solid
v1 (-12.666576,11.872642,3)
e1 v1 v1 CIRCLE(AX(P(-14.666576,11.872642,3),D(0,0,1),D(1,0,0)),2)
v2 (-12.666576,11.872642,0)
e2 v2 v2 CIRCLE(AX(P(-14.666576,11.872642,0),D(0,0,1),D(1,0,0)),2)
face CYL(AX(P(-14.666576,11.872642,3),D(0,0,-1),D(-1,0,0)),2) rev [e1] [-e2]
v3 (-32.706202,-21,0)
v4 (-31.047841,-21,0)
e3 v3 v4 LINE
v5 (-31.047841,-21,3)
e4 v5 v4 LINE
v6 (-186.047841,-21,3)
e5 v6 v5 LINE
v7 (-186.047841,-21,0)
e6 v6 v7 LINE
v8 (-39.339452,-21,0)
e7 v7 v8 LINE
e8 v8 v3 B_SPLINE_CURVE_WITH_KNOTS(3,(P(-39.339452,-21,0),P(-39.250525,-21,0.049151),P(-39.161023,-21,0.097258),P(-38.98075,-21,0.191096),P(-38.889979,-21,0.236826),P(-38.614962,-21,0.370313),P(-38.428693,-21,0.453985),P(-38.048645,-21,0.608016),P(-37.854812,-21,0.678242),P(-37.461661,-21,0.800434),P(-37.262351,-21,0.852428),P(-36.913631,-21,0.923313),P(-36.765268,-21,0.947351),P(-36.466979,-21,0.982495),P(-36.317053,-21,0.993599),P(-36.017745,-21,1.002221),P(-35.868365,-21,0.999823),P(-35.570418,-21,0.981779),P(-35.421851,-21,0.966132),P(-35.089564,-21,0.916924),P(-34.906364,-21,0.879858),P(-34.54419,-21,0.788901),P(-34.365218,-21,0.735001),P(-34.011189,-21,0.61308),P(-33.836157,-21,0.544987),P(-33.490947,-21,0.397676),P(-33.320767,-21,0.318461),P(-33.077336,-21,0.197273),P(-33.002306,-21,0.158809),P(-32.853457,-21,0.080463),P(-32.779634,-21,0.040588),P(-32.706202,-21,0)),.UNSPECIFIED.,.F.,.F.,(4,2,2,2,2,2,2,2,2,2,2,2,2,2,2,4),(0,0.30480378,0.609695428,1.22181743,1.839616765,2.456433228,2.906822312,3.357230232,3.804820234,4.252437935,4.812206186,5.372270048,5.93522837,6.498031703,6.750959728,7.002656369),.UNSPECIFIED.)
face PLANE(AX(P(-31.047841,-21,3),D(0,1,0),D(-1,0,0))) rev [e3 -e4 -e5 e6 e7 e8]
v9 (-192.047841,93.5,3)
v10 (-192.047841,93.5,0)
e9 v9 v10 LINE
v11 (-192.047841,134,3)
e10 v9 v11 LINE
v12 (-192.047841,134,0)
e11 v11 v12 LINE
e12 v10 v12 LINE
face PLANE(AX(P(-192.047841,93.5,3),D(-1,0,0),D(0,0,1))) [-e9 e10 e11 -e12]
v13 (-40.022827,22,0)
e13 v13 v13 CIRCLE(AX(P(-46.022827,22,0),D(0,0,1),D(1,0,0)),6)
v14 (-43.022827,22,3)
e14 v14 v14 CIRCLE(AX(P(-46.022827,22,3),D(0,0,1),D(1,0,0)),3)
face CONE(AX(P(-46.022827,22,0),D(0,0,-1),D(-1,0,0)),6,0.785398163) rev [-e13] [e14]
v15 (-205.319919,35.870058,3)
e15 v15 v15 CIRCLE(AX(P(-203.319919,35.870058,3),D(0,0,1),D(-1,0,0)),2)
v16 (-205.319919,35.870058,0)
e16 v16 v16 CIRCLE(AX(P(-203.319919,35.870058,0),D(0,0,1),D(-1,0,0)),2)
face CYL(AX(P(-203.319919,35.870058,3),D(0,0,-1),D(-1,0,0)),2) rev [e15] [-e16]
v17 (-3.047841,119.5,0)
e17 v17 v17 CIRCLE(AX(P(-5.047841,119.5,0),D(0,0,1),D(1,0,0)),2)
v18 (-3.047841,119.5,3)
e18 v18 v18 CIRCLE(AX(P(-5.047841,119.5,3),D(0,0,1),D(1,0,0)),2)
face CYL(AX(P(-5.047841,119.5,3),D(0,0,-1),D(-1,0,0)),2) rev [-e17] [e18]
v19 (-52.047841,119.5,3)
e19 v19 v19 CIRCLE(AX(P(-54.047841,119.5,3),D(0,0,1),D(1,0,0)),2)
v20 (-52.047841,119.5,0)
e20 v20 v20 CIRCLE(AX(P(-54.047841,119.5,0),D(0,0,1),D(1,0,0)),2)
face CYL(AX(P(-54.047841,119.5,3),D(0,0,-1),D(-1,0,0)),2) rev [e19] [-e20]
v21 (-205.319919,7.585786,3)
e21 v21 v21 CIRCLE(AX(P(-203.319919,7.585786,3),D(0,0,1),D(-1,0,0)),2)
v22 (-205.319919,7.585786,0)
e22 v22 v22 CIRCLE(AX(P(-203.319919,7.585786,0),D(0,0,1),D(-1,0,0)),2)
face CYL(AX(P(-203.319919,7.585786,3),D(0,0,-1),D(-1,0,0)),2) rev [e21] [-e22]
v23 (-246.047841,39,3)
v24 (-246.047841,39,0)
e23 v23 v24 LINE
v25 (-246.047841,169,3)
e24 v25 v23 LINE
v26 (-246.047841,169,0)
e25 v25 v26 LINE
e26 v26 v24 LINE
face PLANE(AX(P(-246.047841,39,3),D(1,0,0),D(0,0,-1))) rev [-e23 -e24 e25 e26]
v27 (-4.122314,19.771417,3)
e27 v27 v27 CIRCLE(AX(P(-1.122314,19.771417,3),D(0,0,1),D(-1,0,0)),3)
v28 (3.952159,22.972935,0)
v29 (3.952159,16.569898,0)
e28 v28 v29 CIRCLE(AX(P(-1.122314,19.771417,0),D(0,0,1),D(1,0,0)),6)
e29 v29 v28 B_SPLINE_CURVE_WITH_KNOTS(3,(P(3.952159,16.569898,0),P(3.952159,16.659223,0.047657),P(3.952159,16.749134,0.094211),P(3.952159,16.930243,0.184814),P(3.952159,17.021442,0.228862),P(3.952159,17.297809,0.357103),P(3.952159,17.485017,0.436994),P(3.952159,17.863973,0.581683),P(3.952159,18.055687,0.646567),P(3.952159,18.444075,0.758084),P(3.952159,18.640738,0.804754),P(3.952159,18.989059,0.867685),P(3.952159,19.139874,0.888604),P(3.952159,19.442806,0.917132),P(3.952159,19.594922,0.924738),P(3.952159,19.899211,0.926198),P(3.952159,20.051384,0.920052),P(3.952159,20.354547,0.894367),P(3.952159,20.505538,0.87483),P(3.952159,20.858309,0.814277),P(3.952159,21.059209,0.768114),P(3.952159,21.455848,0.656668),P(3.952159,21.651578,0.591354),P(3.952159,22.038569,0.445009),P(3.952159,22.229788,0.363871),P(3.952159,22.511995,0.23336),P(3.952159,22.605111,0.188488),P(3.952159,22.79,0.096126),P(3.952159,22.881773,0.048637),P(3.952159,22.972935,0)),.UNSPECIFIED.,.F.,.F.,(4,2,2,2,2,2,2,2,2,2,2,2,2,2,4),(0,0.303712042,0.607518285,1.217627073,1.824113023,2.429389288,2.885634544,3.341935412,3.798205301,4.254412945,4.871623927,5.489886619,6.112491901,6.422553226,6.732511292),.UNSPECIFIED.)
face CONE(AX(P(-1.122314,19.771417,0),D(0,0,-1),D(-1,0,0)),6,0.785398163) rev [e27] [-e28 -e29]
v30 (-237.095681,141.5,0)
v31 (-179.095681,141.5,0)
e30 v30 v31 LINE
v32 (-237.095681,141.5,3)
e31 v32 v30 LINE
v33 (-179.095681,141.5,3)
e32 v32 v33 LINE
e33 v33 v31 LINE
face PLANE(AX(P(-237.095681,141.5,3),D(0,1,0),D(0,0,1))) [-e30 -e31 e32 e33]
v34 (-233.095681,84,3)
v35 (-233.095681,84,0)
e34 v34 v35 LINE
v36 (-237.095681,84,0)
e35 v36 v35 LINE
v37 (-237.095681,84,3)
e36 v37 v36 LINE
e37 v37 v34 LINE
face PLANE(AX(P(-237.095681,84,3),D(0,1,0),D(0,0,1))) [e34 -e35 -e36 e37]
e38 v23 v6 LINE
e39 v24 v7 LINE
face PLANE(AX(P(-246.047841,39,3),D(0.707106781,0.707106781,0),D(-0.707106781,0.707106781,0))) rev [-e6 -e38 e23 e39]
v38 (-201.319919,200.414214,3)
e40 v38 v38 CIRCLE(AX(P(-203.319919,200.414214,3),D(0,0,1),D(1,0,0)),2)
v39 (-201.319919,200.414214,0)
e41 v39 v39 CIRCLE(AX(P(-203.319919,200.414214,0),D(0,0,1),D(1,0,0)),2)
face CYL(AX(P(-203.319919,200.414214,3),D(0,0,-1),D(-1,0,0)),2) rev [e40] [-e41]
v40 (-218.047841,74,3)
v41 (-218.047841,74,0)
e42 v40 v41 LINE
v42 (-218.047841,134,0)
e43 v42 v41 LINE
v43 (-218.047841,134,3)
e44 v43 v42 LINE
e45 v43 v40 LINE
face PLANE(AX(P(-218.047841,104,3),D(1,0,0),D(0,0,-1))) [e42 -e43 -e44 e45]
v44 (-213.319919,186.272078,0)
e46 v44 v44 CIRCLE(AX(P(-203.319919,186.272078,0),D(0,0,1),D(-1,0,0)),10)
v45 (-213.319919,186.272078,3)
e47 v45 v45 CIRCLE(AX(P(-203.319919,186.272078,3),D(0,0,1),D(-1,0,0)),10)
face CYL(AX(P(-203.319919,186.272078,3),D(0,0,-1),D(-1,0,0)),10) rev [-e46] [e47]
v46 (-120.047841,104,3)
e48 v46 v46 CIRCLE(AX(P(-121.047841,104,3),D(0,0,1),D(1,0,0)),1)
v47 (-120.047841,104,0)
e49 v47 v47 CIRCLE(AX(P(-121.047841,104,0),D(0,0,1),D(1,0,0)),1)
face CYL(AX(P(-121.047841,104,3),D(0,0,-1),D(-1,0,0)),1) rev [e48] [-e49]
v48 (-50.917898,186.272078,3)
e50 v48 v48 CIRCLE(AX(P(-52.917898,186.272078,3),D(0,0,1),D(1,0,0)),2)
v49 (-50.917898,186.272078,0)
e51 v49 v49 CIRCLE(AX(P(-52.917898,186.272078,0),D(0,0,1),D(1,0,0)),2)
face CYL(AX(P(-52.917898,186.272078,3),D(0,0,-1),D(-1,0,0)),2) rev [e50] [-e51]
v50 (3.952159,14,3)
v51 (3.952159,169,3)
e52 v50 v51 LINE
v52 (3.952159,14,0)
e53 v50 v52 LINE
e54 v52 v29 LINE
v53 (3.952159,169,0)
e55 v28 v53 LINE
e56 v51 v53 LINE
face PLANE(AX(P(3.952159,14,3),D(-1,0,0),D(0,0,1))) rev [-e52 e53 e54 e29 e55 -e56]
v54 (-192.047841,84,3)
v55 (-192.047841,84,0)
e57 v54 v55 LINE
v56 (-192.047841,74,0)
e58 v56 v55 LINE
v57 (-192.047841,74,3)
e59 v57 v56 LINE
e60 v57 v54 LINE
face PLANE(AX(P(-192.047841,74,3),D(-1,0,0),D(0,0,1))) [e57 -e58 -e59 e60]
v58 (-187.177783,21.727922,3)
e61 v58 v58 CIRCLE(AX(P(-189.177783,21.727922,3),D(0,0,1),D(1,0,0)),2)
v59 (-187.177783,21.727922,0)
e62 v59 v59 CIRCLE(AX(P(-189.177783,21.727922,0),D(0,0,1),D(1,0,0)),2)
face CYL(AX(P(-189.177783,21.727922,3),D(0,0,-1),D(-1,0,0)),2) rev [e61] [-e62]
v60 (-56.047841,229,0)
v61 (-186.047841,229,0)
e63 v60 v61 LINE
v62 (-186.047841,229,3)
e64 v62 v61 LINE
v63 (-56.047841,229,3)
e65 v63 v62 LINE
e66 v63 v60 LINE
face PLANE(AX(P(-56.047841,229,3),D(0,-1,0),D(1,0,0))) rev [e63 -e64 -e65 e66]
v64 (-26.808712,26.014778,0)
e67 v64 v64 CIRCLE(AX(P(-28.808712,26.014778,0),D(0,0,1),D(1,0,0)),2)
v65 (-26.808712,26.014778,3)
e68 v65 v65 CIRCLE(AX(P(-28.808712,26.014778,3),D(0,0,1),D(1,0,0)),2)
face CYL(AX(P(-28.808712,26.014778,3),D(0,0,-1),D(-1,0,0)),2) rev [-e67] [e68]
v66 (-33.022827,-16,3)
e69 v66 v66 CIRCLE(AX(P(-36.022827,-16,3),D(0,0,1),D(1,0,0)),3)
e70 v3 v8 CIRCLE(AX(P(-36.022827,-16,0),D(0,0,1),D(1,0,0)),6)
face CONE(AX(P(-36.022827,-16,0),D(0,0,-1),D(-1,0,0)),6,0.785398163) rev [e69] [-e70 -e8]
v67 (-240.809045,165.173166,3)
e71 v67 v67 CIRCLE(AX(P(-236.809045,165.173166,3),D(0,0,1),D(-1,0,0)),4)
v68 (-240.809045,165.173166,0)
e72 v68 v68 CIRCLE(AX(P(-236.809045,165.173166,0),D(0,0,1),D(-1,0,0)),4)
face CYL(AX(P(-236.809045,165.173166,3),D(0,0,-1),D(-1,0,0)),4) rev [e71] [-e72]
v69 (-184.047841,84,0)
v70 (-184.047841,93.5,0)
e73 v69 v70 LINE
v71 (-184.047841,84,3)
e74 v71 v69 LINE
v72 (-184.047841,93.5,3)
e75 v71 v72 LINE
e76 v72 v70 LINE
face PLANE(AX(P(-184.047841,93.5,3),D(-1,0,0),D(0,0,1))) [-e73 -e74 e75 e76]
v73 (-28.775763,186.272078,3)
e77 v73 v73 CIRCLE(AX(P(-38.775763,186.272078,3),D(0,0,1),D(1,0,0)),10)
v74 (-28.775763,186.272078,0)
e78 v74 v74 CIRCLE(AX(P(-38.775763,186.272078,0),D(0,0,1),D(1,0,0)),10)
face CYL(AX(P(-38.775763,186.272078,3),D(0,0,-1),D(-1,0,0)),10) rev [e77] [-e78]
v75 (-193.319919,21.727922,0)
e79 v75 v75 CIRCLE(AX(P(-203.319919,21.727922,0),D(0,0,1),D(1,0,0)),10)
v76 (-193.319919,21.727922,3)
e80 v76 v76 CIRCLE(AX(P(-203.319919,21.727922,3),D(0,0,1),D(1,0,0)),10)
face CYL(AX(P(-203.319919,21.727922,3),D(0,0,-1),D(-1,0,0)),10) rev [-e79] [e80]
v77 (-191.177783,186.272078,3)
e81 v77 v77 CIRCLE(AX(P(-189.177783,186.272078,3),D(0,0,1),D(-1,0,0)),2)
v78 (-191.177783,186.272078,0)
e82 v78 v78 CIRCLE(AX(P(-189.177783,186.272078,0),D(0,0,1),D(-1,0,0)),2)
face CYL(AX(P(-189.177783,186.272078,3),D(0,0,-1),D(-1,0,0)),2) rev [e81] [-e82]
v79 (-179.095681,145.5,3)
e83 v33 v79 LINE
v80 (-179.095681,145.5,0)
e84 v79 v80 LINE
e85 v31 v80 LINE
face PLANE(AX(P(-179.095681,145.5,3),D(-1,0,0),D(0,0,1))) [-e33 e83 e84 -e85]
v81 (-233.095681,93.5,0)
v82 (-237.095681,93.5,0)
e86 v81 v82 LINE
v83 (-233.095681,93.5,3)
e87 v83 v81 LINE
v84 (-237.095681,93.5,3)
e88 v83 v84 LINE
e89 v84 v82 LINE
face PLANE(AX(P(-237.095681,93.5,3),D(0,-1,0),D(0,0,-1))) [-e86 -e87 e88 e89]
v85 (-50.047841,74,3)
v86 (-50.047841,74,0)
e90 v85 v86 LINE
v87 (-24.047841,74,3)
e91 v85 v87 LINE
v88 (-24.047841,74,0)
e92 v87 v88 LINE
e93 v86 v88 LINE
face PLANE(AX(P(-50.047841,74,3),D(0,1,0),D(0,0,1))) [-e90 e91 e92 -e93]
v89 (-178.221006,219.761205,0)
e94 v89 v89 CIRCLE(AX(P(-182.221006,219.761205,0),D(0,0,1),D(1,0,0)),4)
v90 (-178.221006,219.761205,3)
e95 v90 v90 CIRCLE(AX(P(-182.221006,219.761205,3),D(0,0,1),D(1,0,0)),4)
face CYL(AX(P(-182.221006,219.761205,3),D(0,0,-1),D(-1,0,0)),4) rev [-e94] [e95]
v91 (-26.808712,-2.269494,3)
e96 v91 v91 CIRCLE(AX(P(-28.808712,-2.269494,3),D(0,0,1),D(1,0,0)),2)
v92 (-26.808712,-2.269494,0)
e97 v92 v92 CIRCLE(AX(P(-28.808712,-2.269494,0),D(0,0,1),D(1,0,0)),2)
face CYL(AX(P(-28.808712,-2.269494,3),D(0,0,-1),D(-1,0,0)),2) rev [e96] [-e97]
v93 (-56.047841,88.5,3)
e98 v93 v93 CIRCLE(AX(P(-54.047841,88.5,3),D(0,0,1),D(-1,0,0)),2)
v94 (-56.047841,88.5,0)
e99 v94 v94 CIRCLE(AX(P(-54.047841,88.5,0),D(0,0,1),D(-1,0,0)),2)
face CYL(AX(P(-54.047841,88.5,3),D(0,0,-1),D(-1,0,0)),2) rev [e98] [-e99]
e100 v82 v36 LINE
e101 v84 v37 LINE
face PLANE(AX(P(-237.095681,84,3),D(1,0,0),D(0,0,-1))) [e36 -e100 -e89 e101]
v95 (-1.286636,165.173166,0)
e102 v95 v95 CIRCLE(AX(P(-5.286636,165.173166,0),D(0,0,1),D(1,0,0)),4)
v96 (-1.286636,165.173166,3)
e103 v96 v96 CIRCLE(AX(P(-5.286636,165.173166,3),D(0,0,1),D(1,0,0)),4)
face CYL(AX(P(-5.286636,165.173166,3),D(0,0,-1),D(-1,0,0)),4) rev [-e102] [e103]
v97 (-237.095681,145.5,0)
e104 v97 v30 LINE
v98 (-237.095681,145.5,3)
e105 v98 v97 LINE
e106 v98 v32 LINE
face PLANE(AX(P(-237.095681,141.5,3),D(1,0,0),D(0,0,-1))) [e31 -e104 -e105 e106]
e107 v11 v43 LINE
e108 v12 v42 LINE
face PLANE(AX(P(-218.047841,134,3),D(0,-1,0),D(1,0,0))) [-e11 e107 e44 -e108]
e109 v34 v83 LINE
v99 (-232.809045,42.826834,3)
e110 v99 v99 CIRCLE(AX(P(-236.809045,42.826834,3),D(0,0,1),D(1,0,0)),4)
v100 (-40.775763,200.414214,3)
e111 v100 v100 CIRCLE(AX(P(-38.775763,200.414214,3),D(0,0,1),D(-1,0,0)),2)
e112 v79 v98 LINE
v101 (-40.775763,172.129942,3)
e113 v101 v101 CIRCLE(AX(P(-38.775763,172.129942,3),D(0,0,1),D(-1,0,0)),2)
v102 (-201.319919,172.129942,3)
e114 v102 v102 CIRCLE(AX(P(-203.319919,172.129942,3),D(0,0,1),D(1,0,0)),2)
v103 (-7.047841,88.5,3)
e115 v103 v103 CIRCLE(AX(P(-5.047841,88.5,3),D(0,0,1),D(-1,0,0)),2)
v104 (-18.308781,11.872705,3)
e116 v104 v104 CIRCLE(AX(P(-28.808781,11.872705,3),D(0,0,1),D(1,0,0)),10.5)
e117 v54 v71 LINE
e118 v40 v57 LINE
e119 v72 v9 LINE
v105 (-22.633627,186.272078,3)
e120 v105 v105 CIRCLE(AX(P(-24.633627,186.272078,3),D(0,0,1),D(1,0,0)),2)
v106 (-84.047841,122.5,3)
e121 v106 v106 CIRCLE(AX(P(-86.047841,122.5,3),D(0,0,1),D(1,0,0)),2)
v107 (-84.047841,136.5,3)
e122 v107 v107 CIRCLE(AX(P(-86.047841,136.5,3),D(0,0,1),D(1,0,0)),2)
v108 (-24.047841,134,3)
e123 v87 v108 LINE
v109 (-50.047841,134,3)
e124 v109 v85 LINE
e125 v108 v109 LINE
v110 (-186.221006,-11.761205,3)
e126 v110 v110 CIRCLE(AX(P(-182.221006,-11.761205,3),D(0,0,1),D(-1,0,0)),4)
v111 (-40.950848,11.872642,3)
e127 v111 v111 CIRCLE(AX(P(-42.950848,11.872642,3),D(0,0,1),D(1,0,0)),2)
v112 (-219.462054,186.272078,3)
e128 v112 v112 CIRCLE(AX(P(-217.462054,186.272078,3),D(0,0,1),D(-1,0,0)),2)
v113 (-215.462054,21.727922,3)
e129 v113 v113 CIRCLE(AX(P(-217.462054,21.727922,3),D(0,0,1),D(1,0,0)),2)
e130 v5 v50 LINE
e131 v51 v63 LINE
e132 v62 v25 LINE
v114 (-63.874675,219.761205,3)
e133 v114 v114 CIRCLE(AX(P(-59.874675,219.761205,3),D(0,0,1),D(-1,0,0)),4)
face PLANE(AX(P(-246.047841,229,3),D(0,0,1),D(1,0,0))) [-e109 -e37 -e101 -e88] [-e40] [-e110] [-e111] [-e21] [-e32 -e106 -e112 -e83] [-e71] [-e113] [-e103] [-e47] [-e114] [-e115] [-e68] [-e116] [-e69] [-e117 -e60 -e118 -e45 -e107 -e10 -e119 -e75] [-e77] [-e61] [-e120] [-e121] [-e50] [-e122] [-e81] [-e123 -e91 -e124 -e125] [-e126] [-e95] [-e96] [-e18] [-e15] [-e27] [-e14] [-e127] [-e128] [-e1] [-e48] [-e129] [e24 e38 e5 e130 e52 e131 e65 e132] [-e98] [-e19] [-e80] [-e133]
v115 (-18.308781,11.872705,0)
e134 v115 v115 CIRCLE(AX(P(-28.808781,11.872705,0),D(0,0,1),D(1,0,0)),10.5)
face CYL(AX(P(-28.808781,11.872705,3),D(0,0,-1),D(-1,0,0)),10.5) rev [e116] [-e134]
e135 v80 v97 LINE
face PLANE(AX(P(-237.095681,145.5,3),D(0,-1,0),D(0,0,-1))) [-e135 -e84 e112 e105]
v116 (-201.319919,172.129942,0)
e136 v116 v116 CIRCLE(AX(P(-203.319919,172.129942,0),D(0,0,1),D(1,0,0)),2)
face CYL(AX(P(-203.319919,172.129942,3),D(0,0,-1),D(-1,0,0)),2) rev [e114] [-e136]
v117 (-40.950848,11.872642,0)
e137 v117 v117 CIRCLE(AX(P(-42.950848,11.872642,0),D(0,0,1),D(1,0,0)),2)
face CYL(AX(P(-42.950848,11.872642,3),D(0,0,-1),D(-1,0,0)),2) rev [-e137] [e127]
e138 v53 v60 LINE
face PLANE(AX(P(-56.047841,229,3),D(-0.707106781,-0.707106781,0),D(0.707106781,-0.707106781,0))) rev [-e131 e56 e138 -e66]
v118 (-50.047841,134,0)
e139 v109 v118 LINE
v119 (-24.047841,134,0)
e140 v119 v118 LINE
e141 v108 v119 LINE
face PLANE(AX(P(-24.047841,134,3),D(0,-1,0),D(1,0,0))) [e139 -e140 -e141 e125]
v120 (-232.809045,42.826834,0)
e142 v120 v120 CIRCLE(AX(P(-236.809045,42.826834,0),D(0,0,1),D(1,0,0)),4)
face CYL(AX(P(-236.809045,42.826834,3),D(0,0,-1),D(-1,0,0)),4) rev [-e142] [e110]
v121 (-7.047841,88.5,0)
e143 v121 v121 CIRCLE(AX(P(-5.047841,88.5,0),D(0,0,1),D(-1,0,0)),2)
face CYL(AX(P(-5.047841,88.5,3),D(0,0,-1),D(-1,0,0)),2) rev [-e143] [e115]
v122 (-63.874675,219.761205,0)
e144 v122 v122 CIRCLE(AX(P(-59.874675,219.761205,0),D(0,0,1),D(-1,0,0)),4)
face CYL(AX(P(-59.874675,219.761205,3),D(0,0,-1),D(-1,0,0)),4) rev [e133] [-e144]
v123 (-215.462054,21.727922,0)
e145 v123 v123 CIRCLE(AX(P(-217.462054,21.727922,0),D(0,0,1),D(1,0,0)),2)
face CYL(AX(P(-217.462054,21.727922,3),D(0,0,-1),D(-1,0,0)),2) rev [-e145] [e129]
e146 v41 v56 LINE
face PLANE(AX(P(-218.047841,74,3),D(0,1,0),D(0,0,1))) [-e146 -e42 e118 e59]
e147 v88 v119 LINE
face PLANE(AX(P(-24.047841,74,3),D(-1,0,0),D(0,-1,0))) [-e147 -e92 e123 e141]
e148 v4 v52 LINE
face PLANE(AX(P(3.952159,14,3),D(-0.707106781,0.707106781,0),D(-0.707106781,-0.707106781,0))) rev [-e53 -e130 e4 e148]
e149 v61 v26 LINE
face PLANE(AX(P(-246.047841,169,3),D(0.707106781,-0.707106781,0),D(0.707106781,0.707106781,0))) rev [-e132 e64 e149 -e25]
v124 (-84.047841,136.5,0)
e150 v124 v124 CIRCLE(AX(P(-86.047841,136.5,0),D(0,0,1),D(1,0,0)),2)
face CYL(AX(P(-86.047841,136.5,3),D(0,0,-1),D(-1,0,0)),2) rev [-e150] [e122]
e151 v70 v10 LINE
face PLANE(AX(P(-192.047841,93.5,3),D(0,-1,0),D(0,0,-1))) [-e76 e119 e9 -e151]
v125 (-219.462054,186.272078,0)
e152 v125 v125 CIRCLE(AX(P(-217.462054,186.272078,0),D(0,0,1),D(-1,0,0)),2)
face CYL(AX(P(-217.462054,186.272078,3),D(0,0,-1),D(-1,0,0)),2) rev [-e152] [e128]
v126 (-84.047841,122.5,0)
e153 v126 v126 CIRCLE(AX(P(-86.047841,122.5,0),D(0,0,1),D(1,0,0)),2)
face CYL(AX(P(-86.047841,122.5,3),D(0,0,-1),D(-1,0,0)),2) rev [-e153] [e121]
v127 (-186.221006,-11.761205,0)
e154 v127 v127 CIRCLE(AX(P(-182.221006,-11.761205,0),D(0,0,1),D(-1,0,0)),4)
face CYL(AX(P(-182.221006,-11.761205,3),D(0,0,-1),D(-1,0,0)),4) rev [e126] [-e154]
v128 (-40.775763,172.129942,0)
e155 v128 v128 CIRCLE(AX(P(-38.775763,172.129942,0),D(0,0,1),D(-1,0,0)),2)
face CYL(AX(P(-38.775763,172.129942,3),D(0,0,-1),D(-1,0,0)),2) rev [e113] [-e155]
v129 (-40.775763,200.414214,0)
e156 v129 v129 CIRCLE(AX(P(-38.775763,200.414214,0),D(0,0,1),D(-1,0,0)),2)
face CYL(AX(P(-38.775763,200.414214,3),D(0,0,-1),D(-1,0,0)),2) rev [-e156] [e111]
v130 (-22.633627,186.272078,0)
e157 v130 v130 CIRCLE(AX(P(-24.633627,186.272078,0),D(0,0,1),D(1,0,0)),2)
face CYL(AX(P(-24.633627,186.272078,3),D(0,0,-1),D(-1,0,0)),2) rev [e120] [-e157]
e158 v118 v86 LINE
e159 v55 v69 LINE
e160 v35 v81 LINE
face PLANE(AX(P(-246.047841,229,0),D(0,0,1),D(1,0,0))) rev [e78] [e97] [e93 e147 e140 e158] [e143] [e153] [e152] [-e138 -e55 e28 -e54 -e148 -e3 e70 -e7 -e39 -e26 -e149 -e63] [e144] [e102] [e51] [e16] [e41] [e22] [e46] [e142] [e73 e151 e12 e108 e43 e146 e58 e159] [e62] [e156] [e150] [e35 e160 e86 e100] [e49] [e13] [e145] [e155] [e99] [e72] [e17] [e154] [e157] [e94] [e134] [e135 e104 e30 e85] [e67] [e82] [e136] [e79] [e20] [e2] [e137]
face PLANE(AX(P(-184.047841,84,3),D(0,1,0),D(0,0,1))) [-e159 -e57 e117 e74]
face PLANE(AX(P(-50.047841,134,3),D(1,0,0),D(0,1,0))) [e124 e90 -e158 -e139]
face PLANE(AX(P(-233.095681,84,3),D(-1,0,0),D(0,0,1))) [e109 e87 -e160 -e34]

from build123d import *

# Parameters (mm, degrees)
ESQUISSE1_R      = 2
ESQUISSE1_R_2    = 3
ESQUISSE1_R_3    = 10
ESQUISSE1_R_4    = 10.5
ESQUISSE1_R_5    = 2.000000001
ESQUISSE1_R_6    = 4
ESQUISSE1_R_7    = 1
ESQUISSE1_W      = 26
ESQUISSE1_H      = 60
ESQUISSE1_W_2    = 58
ESQUISSE1_H_2    = 4
ESQUISSE1_W_3    = 4
ESQUISSE1_H_3    = 9.5
EXTRUSION1_DEPTH = 3
CHANFREIN2_SIZE  = 3


with BuildPart() as part:
    # Esquisse1 → Extrusion1 (new body)
    with BuildSketch(Plane.XY):
        Polygon((-246.047840708, 39), (-186.047840708, -21), (-31.047840709, -21), (3.952159291, 14), (3.952159291, 169), (-56.047840709, 229), (-186.047840709, 229), (-246.047840708, 169), align=None)
        with Locations((-42.950847728, 11.872642083)):
            Circle(ESQUISSE1_R, mode=Mode.SUBTRACT)
        with Locations(Location((-1.12231419, 19.771416552, 0), (0, 0, 180))):
            Circle(ESQUISSE1_R_2, mode=Mode.SUBTRACT)
        with Locations((-36.022827062, -16)):
            Circle(ESQUISSE1_R_2, mode=Mode.SUBTRACT)
        with Locations((-28.808712104, 26.014777707)):
            Circle(ESQUISSE1_R, mode=Mode.SUBTRACT)
        with Locations((-203.319918647, 21.727922061)):
            Circle(ESQUISSE1_R_3, mode=Mode.SUBTRACT)
        with Locations(Location((-203.319918647, 7.585786438, 0), (0, 0, 180))):
            Circle(ESQUISSE1_R, mode=Mode.SUBTRACT)
        with Locations((-189.177783023, 21.727922061)):
            Circle(ESQUISSE1_R, mode=Mode.SUBTRACT)
        with Locations(Location((-203.319918647, 35.870057685, 0), (0, 0, 180))):
            Circle(ESQUISSE1_R, mode=Mode.SUBTRACT)
        with Locations((-28.808781353, 11.872704562)):
            Circle(ESQUISSE1_R_4, mode=Mode.SUBTRACT)
        with Locations((-217.462054271, 21.727922061)):
            Circle(ESQUISSE1_R, mode=Mode.SUBTRACT)
        with Locations(Location((-38.77576277, 172.129942315, 0), (0, 0, 180))):
            Circle(ESQUISSE1_R, mode=Mode.SUBTRACT)
        with Locations((-52.917898394, 186.272077939)):
            Circle(ESQUISSE1_R_5, mode=Mode.SUBTRACT)
        with Locations(Location((-38.77576277, 200.414213562, 0), (0, 0, 180))):
            Circle(ESQUISSE1_R, mode=Mode.SUBTRACT)
        with Locations((-24.633627146, 186.272077939)):
            Circle(ESQUISSE1_R, mode=Mode.SUBTRACT)
        with Locations((-38.77576277, 186.272077939)):
            Circle(ESQUISSE1_R_3, mode=Mode.SUBTRACT)
        with Locations(Location((-203.319918647, 186.272077939, 0), (0, 0, 180))):
            Circle(ESQUISSE1_R_3, mode=Mode.SUBTRACT)
        with Locations(Location((-217.462054271, 186.272077939, 0), (0, 0, 180))):
            Circle(ESQUISSE1_R, mode=Mode.SUBTRACT)
        with Locations((-203.319918647, 200.414213562)):
            Circle(ESQUISSE1_R, mode=Mode.SUBTRACT)
        with Locations(Location((-189.177783023, 186.272077939, 0), (0, 0, 180))):
            Circle(ESQUISSE1_R, mode=Mode.SUBTRACT)
        with Locations((-203.319918647, 172.129942315)):
            Circle(ESQUISSE1_R, mode=Mode.SUBTRACT)
        with Locations(Location((-182.221006385, -11.761204675, 0), (0, 0, 180))):
            Circle(ESQUISSE1_R_6, mode=Mode.SUBTRACT)
        with Locations((-182.221006385, 219.761204675)):
            Circle(ESQUISSE1_R_6, mode=Mode.SUBTRACT)
        with Locations((-236.809045383, 42.826834324)):
            Circle(ESQUISSE1_R_6, mode=Mode.SUBTRACT)
        with Locations((-5.047840709, 119.5)):
            Circle(ESQUISSE1_R, mode=Mode.SUBTRACT)
        with Locations(Location((-236.809045383, 165.173165676, 0), (0, 0, 180))):
            Circle(ESQUISSE1_R_6, mode=Mode.SUBTRACT)
        with Locations((-28.808712104, -2.269493541)):
            Circle(ESQUISSE1_R, mode=Mode.SUBTRACT)
        with Locations((-14.66657648, 11.872642083)):
            Circle(ESQUISSE1_R, mode=Mode.SUBTRACT)
        with Locations((-5.286636034, 165.173165676)):
            Circle(ESQUISSE1_R_6, mode=Mode.SUBTRACT)
        with Locations(Location((-59.874675032, 219.761204675, 0), (0, 0, 180))):
            Circle(ESQUISSE1_R_6, mode=Mode.SUBTRACT)
        with Locations(Location((-5.047840709, 88.5, 0), (0, 0, 180))):
            Circle(ESQUISSE1_R, mode=Mode.SUBTRACT)
        with Locations((-86.047840709, 136.5)):
            Circle(ESQUISSE1_R, mode=Mode.SUBTRACT)
        with Locations((-86.047840709, 122.5)):
            Circle(ESQUISSE1_R, mode=Mode.SUBTRACT)
        with Locations((-54.047840709, 119.5)):
            Circle(ESQUISSE1_R, mode=Mode.SUBTRACT)
        with Locations(Location((-54.047840709, 88.5, 0), (0, 0, 180))):
            Circle(ESQUISSE1_R, mode=Mode.SUBTRACT)
        with Locations((-46.022827062, 22)):
            Circle(ESQUISSE1_R_2, mode=Mode.SUBTRACT)
        with Locations((-121.047840709, 104)):
            Circle(ESQUISSE1_R_7, mode=Mode.SUBTRACT)
        Polygon((-192.047840709, 74), (-192.047840709, 84), (-184.047840709, 84), (-184.047840709, 93.5), (-192.047840709, 93.5), (-192.047840709, 134), (-218.047840709, 134), (-218.047840709, 104), (-218.047840709, 74), align=None, mode=Mode.SUBTRACT)
        with Locations((-37.047840709, 104)):
            Rectangle(ESQUISSE1_W, ESQUISSE1_H, mode=Mode.SUBTRACT)
        with Locations((-208.095681417, 143.5)):
            Rectangle(ESQUISSE1_W_2, ESQUISSE1_H_2, mode=Mode.SUBTRACT)
        with Locations((-235.095681417, 88.75)):
            Rectangle(ESQUISSE1_W_3, ESQUISSE1_H_3, mode=Mode.SUBTRACT)
    extrude(amount=EXTRUSION1_DEPTH)

    # Chanfrein2
    # the kernel refuses this chamfer: 3 mm, written as the material it takes off along each edge
    with BuildSketch(Plane(origin=(-46.022827062, 22, 0), x_dir=(1, 0, 0), z_dir=(0, -1, 0))) as chanfrein2_piece_1:
        Polygon((3, CHANFREIN2_SIZE), (3 + CHANFREIN2_SIZE, 0), (3, 0), align=None)
    revolve(axis=Axis((-46.022827062, 22, 0), (0, 0, 1)), mode=Mode.SUBTRACT)
    with BuildSketch(Plane(origin=(-36.022827062, -16, 0), x_dir=(1, 0, 0), z_dir=(0, -1, 0))) as chanfrein2_piece_2:
        Polygon((3, CHANFREIN2_SIZE), (3 + CHANFREIN2_SIZE, 0), (3, 0), align=None)
    revolve(axis=Axis((-36.022827062, -16, 0), (0, 0, 1)), mode=Mode.SUBTRACT)
    with BuildSketch(Plane(origin=(-1.12231419, 19.771416552, 0), x_dir=(-1, 0, 0), z_dir=(0, 1, 0))) as chanfrein2_piece_3:
        Polygon((3, CHANFREIN2_SIZE), (3 + CHANFREIN2_SIZE, 0), (3, 0), align=None)
    revolve(axis=Axis((-1.12231419, 19.771416552, 0), (0, 0, 1)), mode=Mode.SUBTRACT)


solid = part.part
